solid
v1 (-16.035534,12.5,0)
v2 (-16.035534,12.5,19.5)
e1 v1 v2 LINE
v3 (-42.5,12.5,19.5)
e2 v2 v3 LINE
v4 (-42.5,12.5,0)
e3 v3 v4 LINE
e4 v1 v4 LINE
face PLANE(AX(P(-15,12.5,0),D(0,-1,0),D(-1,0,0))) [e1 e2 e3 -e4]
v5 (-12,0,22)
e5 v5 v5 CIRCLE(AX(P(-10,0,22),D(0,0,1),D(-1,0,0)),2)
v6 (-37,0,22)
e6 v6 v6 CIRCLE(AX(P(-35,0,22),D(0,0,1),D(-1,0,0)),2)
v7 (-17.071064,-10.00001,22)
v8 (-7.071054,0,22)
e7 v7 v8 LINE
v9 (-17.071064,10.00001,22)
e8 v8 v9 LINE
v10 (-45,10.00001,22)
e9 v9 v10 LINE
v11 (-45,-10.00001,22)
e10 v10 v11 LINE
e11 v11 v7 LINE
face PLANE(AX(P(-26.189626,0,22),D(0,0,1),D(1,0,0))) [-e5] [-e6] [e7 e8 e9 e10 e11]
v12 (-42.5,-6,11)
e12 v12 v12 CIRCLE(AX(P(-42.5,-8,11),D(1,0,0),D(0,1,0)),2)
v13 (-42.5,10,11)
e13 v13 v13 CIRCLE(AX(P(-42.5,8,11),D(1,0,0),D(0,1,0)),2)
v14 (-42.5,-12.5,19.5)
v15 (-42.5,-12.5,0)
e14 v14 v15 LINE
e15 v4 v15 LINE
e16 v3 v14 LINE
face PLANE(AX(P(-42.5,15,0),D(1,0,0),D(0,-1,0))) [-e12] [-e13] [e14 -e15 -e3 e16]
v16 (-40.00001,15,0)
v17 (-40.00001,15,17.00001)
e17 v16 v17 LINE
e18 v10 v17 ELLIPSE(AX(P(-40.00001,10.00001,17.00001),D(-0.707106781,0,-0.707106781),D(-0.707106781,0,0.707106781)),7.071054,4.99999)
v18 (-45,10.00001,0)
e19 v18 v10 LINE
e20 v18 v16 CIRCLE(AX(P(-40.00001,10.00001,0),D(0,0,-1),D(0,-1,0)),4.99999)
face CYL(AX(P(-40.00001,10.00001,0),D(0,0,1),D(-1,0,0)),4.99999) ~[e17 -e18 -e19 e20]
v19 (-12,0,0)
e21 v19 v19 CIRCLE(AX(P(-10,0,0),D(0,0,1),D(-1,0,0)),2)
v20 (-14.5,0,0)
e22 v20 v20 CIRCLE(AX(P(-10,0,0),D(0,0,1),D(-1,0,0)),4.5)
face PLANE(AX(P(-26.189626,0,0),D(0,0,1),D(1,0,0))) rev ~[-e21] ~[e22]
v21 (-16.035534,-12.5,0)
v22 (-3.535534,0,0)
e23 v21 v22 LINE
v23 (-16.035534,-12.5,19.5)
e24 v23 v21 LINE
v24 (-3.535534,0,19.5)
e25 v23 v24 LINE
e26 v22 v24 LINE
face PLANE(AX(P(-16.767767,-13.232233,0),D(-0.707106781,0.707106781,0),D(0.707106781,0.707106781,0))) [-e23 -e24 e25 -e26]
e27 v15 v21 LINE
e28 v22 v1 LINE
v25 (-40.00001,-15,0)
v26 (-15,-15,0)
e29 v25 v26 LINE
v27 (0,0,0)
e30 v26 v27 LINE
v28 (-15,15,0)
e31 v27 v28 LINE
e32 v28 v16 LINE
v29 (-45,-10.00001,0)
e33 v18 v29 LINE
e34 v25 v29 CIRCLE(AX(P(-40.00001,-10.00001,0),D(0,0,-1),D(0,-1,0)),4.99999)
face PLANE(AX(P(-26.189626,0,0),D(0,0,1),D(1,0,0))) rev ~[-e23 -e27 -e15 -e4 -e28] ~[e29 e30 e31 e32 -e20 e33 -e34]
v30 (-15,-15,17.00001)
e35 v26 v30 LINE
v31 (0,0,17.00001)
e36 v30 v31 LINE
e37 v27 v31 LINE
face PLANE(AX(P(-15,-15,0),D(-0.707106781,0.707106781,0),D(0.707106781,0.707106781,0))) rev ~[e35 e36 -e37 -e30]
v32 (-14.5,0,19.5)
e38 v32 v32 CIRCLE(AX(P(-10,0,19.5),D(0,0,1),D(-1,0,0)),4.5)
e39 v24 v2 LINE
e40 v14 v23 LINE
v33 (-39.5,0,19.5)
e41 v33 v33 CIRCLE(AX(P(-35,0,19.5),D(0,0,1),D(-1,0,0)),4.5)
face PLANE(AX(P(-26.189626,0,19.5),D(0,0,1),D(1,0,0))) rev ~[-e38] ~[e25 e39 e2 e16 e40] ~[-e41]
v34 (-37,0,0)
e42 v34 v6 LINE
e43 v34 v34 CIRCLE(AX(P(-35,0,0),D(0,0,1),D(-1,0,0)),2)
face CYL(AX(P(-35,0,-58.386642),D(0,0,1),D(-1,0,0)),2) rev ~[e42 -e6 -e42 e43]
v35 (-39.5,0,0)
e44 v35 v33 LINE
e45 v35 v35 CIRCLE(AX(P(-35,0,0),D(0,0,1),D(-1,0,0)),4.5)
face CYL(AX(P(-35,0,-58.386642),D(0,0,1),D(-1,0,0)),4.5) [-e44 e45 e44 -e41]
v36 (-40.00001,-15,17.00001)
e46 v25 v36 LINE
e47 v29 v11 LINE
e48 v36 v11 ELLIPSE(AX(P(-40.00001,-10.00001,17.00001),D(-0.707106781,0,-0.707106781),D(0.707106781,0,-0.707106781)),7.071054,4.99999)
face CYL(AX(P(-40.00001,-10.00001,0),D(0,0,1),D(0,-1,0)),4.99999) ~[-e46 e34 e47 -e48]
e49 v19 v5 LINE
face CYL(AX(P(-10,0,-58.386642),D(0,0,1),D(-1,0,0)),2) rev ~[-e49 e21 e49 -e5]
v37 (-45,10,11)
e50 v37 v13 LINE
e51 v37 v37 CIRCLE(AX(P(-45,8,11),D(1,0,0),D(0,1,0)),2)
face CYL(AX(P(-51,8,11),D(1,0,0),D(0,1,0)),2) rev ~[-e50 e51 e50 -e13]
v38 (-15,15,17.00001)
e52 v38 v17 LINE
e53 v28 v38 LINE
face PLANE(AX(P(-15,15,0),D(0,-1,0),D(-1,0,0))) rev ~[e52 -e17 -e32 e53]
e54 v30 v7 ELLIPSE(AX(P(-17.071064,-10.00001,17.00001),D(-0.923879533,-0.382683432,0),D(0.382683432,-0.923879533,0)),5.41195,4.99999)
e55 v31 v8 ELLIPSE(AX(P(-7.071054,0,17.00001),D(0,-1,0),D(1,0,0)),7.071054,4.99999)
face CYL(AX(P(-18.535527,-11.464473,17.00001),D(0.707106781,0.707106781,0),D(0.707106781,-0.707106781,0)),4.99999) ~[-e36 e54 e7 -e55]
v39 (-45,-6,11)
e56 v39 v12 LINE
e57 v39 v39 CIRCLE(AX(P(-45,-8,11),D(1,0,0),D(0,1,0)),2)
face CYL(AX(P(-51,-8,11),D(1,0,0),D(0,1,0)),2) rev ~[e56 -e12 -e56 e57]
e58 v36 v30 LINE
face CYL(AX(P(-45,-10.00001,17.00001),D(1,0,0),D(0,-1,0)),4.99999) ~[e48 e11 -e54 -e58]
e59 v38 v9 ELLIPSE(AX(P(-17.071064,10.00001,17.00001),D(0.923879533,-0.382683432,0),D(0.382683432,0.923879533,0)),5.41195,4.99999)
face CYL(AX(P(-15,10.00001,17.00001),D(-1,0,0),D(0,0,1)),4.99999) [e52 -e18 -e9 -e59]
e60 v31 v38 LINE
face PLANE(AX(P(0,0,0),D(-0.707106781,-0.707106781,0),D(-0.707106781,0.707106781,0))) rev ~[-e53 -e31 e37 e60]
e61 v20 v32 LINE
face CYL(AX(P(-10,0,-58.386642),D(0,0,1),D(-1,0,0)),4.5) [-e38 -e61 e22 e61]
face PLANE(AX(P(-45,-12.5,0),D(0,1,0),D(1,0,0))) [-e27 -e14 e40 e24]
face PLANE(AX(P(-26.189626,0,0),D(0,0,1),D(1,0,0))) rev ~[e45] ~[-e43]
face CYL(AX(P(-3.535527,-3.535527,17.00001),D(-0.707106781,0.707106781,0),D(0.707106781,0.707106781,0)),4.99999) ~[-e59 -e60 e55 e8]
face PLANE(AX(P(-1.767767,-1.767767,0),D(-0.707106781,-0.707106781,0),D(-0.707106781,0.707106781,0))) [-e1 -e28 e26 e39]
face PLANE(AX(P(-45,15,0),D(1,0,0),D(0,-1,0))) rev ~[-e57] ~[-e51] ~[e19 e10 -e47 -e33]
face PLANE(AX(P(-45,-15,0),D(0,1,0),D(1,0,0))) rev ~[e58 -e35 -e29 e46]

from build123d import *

# Parameters (mm, degrees)
F1_DEPTH = 22
F2_D     = 4
F3_T     = -2.5
F5_D     = 4
F5_DEPTH = 6
F5_TIP   = 1.2017212381
F6_R     = 4.99999


# Not quite as in the source:
# - a fillet or chamfer is up to 0.001 mm smaller than in the source, because OpenCascade refuses the exact size


with BuildPart() as f1:
    # F0 (on Top) → F1 (new body)
    with BuildSketch(Plane.XY):
        Polygon((-15, -15), (0, 0), (-15, 15), (-45, 15), (-45, -15), align=None)
    extrude(amount=F1_DEPTH)

    # F2 (through all)
    with Locations(Plane(origin=(0, 0, 0), x_dir=(1, 0, 0), z_dir=(0, 0, -1))):
        with Locations((-35, 0), (-10, 0)):
            Hole(F2_D / 2)

    # F3
    f3_openings = [f1.faces().sort_by_distance(p)[0] for p in [
        (-26.079977, 0, 0),
    ]]
    offset(amount=F3_T, openings=f3_openings)

    # F5
    with Locations(Plane(origin=(-45, 0, 0), x_dir=(0, -1, 0), z_dir=(-1, 0, 0))):
        with Locations((-8, 11), (8, 11)):
            Hole(F5_D / 2, depth=F5_DEPTH)
            with Locations((0, 0, -(F5_DEPTH + F5_TIP / 2))):  # 118° drill point
                Cone(0, F5_D / 2, F5_TIP, mode=Mode.SUBTRACT)

    # F6 (radius 5 in the source; OpenCascade refuses exactly that, so slightly less here)
    f6_edges = [f1.edges().sort_by_distance(p)[0] for p in [
        (-30, -15, 22),
        (-7.5, -7.5, 22),
        (-7.5, 7.5, 22),
        (-30, 15, 22),
        (-45, 15, 11),
        (-45, -15, 11),
    ]]
    fillet(f6_edges, radius=F6_R)


solid = f1.part
